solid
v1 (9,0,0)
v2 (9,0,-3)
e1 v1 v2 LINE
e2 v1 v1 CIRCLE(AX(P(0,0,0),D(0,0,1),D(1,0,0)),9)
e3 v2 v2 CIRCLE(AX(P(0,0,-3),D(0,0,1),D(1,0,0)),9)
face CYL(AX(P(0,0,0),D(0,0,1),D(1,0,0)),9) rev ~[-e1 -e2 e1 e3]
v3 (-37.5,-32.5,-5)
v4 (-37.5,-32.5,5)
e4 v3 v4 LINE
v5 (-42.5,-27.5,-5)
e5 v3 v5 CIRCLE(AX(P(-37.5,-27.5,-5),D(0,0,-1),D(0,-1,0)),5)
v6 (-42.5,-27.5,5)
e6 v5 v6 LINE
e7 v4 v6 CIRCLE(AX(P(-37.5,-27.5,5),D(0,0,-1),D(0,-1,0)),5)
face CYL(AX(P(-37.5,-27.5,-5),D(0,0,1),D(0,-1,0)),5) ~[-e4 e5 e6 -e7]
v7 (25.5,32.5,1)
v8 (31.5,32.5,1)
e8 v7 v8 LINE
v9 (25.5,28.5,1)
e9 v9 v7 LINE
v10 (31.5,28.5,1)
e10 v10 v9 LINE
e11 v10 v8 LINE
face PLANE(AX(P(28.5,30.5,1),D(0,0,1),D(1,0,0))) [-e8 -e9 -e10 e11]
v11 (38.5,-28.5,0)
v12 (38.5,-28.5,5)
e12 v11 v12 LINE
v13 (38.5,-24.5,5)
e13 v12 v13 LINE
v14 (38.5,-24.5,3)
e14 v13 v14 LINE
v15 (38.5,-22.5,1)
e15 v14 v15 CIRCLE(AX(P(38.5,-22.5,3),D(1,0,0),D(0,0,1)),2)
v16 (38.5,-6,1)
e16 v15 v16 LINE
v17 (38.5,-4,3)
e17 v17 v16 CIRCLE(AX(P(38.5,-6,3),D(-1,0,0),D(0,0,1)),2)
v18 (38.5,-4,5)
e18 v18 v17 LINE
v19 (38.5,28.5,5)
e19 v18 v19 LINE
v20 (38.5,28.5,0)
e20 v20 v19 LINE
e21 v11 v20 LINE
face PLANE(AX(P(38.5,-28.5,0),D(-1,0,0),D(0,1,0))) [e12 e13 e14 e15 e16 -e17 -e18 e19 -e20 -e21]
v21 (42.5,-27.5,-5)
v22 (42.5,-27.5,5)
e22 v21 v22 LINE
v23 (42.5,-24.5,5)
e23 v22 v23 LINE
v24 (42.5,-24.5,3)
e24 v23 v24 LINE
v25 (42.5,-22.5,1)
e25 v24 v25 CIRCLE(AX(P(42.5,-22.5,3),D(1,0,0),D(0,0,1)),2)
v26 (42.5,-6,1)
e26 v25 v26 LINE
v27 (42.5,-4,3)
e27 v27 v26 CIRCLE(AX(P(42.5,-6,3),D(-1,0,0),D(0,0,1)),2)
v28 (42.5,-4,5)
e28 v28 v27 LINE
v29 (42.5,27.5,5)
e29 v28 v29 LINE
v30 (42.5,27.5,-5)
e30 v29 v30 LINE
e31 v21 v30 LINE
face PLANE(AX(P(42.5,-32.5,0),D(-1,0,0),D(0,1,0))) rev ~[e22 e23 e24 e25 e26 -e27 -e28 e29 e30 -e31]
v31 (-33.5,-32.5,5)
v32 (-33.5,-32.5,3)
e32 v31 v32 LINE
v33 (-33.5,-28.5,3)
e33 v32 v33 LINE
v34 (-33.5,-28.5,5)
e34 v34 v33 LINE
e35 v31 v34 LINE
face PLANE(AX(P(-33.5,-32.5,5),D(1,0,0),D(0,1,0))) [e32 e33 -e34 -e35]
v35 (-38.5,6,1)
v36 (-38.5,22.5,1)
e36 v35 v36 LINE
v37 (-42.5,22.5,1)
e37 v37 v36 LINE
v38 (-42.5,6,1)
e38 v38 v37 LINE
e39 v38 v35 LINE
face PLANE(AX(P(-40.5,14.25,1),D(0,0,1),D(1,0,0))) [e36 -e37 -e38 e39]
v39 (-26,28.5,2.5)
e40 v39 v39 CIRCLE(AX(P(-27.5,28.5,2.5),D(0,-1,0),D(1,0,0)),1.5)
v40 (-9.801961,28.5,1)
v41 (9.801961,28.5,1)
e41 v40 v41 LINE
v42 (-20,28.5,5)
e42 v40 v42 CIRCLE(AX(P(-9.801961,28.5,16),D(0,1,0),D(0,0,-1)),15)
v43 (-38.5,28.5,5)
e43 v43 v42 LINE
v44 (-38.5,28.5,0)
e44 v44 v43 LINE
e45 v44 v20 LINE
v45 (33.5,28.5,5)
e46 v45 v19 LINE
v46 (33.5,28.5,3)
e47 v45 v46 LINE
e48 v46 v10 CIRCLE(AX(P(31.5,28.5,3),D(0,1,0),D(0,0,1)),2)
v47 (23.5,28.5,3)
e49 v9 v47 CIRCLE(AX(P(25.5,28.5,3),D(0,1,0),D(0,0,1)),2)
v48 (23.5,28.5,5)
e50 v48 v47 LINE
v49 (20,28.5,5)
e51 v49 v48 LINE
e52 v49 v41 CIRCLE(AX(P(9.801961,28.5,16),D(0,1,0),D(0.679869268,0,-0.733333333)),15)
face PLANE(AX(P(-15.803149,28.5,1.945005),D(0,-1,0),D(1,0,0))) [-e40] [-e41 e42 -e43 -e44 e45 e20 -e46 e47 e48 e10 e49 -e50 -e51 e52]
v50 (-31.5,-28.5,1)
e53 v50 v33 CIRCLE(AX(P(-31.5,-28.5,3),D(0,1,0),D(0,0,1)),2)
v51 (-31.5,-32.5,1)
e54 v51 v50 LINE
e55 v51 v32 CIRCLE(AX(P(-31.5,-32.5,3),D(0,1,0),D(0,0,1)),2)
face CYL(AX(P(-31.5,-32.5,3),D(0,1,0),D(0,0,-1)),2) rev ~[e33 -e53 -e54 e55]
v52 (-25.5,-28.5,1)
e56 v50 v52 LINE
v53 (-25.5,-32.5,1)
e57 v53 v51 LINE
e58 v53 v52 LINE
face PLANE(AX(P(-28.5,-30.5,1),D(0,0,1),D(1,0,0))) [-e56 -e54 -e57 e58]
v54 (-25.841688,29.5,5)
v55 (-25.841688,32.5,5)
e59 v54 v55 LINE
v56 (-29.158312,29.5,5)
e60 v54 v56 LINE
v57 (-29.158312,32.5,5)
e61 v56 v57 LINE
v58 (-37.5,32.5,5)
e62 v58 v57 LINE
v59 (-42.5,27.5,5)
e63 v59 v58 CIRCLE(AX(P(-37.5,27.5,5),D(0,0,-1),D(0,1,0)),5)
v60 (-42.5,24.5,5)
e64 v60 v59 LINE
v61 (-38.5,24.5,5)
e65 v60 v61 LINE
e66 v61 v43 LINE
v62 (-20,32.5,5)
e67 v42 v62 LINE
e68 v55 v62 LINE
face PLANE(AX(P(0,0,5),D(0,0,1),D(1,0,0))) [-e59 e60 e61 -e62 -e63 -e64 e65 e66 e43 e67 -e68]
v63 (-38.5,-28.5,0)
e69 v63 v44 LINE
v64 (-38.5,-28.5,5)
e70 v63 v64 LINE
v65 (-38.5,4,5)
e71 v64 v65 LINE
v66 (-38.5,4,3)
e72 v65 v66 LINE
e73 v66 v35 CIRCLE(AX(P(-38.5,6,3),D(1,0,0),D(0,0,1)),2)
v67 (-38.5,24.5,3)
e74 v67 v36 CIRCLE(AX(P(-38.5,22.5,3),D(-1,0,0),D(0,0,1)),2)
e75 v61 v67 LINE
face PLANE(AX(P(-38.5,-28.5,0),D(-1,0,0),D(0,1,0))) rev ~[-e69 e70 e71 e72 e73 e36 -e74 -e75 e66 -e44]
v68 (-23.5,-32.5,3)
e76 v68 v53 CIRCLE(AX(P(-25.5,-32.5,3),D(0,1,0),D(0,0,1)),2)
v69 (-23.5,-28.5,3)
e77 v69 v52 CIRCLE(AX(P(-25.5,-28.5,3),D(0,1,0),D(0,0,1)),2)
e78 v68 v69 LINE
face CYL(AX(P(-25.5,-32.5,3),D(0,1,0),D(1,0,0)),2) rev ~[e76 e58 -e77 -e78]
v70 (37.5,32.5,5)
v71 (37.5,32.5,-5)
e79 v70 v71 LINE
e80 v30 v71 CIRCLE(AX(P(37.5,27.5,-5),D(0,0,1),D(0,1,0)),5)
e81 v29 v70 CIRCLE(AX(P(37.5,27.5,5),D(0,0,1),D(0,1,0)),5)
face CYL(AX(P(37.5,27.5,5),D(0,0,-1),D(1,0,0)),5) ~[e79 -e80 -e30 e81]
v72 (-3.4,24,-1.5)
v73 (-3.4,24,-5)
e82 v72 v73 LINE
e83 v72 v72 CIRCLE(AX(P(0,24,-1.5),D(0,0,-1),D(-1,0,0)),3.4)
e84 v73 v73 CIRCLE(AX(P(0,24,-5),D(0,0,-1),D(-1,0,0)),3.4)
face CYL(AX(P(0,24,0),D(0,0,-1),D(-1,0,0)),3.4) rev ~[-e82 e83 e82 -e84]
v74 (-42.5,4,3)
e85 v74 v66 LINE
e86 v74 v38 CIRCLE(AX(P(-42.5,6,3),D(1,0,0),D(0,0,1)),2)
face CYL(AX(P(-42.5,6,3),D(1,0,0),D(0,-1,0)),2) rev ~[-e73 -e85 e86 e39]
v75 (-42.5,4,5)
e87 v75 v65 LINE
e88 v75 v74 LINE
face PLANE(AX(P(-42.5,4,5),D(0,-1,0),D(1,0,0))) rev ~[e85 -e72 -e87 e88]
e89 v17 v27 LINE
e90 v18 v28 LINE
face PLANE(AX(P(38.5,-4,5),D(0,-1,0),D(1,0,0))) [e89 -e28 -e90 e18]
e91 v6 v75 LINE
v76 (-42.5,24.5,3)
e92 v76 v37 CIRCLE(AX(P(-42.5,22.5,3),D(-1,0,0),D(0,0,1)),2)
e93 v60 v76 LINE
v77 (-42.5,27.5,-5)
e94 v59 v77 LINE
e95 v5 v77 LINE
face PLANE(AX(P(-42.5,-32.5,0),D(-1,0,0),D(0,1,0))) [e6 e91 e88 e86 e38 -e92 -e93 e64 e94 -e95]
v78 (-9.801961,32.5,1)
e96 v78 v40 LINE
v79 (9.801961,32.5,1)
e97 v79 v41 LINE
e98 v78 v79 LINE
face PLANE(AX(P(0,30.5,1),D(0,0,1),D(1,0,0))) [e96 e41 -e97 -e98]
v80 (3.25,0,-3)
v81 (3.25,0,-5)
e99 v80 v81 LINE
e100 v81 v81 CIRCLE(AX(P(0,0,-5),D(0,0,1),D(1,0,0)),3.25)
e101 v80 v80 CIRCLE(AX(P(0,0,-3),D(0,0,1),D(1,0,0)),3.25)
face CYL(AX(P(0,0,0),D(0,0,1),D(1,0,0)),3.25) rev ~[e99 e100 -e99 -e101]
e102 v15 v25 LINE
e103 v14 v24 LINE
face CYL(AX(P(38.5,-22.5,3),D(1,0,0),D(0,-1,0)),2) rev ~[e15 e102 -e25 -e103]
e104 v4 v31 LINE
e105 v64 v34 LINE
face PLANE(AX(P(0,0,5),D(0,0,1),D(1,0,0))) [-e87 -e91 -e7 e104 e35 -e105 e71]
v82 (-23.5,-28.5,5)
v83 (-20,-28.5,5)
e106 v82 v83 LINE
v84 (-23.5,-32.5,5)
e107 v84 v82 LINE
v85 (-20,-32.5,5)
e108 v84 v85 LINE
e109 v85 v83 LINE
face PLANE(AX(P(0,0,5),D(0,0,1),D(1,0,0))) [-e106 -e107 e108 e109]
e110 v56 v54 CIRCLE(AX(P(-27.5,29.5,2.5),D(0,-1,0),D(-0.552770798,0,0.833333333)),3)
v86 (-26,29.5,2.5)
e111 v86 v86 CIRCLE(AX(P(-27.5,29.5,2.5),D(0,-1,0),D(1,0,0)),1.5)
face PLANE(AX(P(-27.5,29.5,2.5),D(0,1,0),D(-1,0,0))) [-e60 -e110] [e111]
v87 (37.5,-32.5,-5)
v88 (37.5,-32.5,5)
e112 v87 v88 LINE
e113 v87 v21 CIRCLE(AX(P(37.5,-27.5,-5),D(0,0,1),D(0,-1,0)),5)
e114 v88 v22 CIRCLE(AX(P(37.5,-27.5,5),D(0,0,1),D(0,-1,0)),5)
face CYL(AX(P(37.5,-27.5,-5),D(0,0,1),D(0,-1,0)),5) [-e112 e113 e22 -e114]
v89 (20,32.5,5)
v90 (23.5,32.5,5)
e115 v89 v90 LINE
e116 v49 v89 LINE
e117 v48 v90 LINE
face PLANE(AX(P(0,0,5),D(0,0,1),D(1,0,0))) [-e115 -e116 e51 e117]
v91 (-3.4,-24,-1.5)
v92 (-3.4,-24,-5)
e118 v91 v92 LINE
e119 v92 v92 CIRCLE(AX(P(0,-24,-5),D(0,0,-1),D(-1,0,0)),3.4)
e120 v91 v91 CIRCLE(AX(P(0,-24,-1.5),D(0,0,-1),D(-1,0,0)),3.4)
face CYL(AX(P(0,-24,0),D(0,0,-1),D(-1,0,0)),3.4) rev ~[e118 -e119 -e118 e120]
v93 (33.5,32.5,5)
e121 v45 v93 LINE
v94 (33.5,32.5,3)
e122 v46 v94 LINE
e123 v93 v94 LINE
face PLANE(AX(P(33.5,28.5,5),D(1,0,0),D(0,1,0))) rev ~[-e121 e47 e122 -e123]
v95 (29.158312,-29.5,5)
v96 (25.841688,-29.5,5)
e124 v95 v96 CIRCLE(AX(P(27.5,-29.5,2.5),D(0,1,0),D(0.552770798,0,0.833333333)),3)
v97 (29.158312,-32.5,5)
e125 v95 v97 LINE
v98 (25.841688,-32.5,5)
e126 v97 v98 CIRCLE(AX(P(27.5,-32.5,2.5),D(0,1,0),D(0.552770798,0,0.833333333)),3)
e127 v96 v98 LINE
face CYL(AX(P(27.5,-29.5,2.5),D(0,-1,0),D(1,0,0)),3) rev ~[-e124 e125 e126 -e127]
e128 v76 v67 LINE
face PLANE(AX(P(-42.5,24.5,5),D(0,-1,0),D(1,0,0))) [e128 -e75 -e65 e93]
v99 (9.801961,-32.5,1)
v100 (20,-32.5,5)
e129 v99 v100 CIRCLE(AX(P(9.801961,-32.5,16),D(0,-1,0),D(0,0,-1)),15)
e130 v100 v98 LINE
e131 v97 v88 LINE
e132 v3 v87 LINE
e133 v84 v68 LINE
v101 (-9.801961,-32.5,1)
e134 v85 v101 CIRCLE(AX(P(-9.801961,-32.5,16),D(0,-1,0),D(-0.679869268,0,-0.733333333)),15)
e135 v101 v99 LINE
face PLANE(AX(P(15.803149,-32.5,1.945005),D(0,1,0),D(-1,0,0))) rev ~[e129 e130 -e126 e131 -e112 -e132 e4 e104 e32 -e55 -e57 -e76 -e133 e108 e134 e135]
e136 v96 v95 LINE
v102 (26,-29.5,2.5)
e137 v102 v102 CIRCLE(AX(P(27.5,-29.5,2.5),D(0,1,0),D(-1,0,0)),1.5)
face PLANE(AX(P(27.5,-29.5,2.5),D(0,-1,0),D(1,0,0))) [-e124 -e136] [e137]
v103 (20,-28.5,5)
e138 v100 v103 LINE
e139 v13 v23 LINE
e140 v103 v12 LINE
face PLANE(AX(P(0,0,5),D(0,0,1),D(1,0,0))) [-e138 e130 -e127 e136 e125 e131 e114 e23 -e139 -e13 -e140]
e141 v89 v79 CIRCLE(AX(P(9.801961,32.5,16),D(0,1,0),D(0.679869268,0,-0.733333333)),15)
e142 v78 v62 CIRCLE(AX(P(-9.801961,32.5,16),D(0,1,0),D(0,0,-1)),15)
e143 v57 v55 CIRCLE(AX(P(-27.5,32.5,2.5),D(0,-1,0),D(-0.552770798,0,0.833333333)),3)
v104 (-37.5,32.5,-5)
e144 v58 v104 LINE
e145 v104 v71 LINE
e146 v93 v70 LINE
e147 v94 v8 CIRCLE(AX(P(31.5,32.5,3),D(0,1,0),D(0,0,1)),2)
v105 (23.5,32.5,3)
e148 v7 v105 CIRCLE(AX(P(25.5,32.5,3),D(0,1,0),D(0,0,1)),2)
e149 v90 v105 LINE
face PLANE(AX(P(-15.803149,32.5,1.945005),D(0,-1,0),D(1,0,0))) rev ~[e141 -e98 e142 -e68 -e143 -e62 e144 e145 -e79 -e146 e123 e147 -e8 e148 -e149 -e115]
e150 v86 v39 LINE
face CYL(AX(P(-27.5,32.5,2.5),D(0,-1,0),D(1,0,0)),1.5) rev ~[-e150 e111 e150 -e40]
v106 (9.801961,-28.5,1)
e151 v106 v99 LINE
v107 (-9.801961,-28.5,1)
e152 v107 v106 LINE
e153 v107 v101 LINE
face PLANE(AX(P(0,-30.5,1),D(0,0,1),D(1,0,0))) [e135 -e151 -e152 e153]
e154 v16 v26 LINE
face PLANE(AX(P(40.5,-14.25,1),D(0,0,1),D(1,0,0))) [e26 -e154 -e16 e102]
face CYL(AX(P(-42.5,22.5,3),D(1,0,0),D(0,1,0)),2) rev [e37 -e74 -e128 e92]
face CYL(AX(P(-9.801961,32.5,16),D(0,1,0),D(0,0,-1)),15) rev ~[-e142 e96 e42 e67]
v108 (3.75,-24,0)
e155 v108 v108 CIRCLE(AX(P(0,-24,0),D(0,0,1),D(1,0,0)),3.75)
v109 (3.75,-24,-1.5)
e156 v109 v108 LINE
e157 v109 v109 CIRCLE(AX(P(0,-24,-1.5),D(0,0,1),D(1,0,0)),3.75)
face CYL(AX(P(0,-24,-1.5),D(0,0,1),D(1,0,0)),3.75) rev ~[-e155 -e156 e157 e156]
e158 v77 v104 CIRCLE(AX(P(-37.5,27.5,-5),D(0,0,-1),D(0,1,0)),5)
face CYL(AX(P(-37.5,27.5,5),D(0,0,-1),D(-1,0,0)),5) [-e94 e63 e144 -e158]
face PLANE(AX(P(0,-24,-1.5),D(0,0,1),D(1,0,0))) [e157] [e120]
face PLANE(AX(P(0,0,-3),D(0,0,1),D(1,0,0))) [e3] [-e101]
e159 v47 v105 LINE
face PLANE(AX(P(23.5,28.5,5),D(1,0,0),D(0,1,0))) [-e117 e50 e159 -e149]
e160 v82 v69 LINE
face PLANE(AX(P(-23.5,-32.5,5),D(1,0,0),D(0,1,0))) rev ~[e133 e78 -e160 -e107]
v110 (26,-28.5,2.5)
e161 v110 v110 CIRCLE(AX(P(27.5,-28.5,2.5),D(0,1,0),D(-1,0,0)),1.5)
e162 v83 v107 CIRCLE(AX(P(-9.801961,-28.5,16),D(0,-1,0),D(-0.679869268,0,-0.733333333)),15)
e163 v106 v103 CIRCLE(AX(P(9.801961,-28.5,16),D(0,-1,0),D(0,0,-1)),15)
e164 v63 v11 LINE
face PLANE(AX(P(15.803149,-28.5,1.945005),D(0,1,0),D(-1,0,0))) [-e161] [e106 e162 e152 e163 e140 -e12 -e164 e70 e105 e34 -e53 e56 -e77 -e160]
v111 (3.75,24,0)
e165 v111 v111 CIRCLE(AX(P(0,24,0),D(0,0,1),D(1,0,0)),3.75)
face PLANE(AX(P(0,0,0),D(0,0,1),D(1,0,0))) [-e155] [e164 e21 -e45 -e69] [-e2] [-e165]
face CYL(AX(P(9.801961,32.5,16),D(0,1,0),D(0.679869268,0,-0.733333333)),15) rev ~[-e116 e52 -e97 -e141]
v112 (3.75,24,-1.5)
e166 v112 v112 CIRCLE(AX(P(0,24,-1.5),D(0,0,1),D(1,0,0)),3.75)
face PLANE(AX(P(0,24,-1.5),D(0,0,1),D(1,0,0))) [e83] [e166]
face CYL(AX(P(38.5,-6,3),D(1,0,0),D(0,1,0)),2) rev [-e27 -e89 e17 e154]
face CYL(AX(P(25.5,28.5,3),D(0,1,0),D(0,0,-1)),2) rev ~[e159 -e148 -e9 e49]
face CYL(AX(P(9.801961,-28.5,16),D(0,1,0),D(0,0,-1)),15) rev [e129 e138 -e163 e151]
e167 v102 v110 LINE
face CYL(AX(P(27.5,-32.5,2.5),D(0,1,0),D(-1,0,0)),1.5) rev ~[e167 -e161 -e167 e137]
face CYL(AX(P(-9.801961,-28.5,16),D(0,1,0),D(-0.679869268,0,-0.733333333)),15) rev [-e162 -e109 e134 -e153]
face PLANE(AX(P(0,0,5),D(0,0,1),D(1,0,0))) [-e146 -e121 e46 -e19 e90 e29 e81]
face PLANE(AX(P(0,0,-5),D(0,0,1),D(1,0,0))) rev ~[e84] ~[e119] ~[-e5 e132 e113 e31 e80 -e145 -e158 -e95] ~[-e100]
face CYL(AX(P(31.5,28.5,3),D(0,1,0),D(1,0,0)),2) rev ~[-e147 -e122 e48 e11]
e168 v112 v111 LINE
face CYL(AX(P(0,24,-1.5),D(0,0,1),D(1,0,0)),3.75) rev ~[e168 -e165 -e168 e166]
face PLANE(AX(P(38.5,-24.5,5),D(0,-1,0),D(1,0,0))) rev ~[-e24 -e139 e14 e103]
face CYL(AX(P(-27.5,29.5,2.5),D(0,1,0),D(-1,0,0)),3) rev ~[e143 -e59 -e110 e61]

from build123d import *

# Parameters (mm, degrees)
F0_W                   = 85
F0_H                   = 65
F0_W_2                 = 77
F0_H_2                 = 57
F1_DEPTH               = 5
F2_DEPTH               = 5
F3_W                   = 10
F3_H                   = 4
F3_W_2                 = 40
F3_W_3                 = 4
F3_H_2                 = 20.5
F4_DEPTH               = 4
F5_T1_DEPTH            = 4
F5_T3_DEPTH            = 4
F6_R                   = 2
F8_D                   = 6.8
F8_CBORE_D             = 7.5
F8_CBORE_DEPTH         = 1.5
F9_R                   = 9
F9_R_2                 = 3.25
F10_DEPTH              = 3
F11_DEPTH              = 25
F12_R                  = 5
F15_D                  = 3
F15_CBORE_D            = 6
F15_CBORE_DEPTH        = 3
F15_ON_F13_D           = 3
F15_ON_F13_CBORE_D     = 6
F15_ON_F13_CBORE_DEPTH = 3


# Not quite as in the source:
# - a fillet or chamfer that OpenCascade refuses, or shapes differently, is made with other operations: its cross-section is extruded or revolved along the edge and cut away or added


with BuildPart() as f1:
    # F0 (on Top) → F1 (new body)
    with BuildSketch(Plane.XY):
        Rectangle(F0_W, F0_H)
        Rectangle(F0_W_2, F0_H_2, mode=Mode.SUBTRACT)
        Rectangle(F0_W_2, F0_H_2)
    extrude(amount=-F1_DEPTH)

    # F0 (on Top) → F2 (join)
    with BuildSketch(Plane.XY):
        Rectangle(F0_W, F0_H)
        Rectangle(F0_W_2, F0_H_2, mode=Mode.SUBTRACT)
    extrude(amount=F2_DEPTH)

    # F3 (on face) → F4 (cut)
    with BuildSketch(Plane.XY.offset(5)):
        with Locations((28.5, 30.5)):
            Rectangle(F3_W, F3_H)
        with Locations((0, 30.5)):
            Rectangle(F3_W_2, F3_H)
        with Locations((0, -30.5)):
            Rectangle(F3_W_2, F3_H)
        with Locations((-28.5, -30.5)):
            Rectangle(F3_W, F3_H)
        with Locations((-40.5, 14.25)):
            Rectangle(F3_W_3, F3_H_2)
        with Locations((40.5, -14.25)):
            Rectangle(F3_W_3, F3_H_2)
    extrude(amount=-F4_DEPTH, mode=Mode.SUBTRACT)

    # F5: fillet of radius 15 on 4 edges, made by hand

    # F5_s2 → F5_t1 (join)
    with BuildSketch(Plane.XZ.offset(-32.5)):
        with BuildLine():
            ThreePointArc((-9.8019609728, 1), (-15.2791865479, 2.0357599562), (-20, 5))
            Line((-20, 5), (-20, 1))
            Line((-20, 1), (-9.8019609728, 1))
        make_face()
        with BuildLine():
            ThreePointArc((20, 5), (15.2791865479, 2.0357599562), (9.8019609728, 1))
            Line((9.8019609728, 1), (20, 1))
            Line((20, 1), (20, 5))
        make_face()
    extrude(amount=F5_T1_DEPTH)

    # F5_s4 → F5_t3 (join)
    with BuildSketch(Plane.XZ.offset(28.5)):
        with BuildLine():
            ThreePointArc((9.8019609728, 1), (15.2791865479, 2.0357599562), (20, 5))
            Line((20, 5), (20, 1))
            Line((20, 1), (9.8019609728, 1))
        make_face()
        with BuildLine():
            ThreePointArc((-20, 5), (-15.2791865479, 2.0357599562), (-9.8019609728, 1))
            Line((-9.8019609728, 1), (-20, 1))
            Line((-20, 1), (-20, 5))
        make_face()
    extrude(amount=F5_T3_DEPTH)

    # F6
    f6_edges = [f1.edges().sort_by_distance(p)[0] for p in [
        (40.5, -4, 1),
        (40.5, -24.5, 1),
        (-40.5, 24.5, 1),
        (-40.5, 4, 1),
        (-33.5, -30.5, 1),
        (-23.5, -30.5, 1),
        (33.5, 30.5, 1),
        (23.5, 30.5, 1),
    ]]
    fillet(f6_edges, radius=F6_R)

    # F8 (through all)
    with Locations(Plane.XY):
        with Locations((0, 24), (0, -24)):
            CounterBoreHole(F8_D / 2, F8_CBORE_D / 2, F8_CBORE_DEPTH)

    # F9 (on face) → F10 (cut)
    with BuildSketch(Plane.XY):
        Circle(F9_R)
        Circle(F9_R_2, mode=Mode.SUBTRACT)
    extrude(amount=-F10_DEPTH, mode=Mode.SUBTRACT)

    # F9 (on face) → F11 (cut)
    with BuildSketch(Plane.XY):
        Circle(F9_R_2)
    extrude(amount=-F11_DEPTH, mode=Mode.SUBTRACT)

    # F12
    f12_edges = [f1.edges().sort_by_distance(p)[0] for p in [
        (42.5, -32.5, 0),
        (42.5, 32.5, 0),
        (-42.5, -32.5, 0),
        (-42.5, 32.5, 0),
    ]]
    fillet(f12_edges, radius=F12_R)

    # F15 (through all)
    with Locations(Plane(origin=(0, 32.5, 0), x_dir=(-1, 0, 0), z_dir=(0, 1, 0))):
        with Locations((27.5, 2.5)):
            CounterBoreHole(F15_D / 2, F15_CBORE_D / 2, F15_CBORE_DEPTH)

    # F15 on F13 (through all)
    with Locations(Plane.XZ.offset(32.5)):
        with Locations((27.5, 2.5)):
            CounterBoreHole(F15_ON_F13_D / 2, F15_ON_F13_CBORE_D / 2, F15_ON_F13_CBORE_DEPTH)


solid = f1.part
